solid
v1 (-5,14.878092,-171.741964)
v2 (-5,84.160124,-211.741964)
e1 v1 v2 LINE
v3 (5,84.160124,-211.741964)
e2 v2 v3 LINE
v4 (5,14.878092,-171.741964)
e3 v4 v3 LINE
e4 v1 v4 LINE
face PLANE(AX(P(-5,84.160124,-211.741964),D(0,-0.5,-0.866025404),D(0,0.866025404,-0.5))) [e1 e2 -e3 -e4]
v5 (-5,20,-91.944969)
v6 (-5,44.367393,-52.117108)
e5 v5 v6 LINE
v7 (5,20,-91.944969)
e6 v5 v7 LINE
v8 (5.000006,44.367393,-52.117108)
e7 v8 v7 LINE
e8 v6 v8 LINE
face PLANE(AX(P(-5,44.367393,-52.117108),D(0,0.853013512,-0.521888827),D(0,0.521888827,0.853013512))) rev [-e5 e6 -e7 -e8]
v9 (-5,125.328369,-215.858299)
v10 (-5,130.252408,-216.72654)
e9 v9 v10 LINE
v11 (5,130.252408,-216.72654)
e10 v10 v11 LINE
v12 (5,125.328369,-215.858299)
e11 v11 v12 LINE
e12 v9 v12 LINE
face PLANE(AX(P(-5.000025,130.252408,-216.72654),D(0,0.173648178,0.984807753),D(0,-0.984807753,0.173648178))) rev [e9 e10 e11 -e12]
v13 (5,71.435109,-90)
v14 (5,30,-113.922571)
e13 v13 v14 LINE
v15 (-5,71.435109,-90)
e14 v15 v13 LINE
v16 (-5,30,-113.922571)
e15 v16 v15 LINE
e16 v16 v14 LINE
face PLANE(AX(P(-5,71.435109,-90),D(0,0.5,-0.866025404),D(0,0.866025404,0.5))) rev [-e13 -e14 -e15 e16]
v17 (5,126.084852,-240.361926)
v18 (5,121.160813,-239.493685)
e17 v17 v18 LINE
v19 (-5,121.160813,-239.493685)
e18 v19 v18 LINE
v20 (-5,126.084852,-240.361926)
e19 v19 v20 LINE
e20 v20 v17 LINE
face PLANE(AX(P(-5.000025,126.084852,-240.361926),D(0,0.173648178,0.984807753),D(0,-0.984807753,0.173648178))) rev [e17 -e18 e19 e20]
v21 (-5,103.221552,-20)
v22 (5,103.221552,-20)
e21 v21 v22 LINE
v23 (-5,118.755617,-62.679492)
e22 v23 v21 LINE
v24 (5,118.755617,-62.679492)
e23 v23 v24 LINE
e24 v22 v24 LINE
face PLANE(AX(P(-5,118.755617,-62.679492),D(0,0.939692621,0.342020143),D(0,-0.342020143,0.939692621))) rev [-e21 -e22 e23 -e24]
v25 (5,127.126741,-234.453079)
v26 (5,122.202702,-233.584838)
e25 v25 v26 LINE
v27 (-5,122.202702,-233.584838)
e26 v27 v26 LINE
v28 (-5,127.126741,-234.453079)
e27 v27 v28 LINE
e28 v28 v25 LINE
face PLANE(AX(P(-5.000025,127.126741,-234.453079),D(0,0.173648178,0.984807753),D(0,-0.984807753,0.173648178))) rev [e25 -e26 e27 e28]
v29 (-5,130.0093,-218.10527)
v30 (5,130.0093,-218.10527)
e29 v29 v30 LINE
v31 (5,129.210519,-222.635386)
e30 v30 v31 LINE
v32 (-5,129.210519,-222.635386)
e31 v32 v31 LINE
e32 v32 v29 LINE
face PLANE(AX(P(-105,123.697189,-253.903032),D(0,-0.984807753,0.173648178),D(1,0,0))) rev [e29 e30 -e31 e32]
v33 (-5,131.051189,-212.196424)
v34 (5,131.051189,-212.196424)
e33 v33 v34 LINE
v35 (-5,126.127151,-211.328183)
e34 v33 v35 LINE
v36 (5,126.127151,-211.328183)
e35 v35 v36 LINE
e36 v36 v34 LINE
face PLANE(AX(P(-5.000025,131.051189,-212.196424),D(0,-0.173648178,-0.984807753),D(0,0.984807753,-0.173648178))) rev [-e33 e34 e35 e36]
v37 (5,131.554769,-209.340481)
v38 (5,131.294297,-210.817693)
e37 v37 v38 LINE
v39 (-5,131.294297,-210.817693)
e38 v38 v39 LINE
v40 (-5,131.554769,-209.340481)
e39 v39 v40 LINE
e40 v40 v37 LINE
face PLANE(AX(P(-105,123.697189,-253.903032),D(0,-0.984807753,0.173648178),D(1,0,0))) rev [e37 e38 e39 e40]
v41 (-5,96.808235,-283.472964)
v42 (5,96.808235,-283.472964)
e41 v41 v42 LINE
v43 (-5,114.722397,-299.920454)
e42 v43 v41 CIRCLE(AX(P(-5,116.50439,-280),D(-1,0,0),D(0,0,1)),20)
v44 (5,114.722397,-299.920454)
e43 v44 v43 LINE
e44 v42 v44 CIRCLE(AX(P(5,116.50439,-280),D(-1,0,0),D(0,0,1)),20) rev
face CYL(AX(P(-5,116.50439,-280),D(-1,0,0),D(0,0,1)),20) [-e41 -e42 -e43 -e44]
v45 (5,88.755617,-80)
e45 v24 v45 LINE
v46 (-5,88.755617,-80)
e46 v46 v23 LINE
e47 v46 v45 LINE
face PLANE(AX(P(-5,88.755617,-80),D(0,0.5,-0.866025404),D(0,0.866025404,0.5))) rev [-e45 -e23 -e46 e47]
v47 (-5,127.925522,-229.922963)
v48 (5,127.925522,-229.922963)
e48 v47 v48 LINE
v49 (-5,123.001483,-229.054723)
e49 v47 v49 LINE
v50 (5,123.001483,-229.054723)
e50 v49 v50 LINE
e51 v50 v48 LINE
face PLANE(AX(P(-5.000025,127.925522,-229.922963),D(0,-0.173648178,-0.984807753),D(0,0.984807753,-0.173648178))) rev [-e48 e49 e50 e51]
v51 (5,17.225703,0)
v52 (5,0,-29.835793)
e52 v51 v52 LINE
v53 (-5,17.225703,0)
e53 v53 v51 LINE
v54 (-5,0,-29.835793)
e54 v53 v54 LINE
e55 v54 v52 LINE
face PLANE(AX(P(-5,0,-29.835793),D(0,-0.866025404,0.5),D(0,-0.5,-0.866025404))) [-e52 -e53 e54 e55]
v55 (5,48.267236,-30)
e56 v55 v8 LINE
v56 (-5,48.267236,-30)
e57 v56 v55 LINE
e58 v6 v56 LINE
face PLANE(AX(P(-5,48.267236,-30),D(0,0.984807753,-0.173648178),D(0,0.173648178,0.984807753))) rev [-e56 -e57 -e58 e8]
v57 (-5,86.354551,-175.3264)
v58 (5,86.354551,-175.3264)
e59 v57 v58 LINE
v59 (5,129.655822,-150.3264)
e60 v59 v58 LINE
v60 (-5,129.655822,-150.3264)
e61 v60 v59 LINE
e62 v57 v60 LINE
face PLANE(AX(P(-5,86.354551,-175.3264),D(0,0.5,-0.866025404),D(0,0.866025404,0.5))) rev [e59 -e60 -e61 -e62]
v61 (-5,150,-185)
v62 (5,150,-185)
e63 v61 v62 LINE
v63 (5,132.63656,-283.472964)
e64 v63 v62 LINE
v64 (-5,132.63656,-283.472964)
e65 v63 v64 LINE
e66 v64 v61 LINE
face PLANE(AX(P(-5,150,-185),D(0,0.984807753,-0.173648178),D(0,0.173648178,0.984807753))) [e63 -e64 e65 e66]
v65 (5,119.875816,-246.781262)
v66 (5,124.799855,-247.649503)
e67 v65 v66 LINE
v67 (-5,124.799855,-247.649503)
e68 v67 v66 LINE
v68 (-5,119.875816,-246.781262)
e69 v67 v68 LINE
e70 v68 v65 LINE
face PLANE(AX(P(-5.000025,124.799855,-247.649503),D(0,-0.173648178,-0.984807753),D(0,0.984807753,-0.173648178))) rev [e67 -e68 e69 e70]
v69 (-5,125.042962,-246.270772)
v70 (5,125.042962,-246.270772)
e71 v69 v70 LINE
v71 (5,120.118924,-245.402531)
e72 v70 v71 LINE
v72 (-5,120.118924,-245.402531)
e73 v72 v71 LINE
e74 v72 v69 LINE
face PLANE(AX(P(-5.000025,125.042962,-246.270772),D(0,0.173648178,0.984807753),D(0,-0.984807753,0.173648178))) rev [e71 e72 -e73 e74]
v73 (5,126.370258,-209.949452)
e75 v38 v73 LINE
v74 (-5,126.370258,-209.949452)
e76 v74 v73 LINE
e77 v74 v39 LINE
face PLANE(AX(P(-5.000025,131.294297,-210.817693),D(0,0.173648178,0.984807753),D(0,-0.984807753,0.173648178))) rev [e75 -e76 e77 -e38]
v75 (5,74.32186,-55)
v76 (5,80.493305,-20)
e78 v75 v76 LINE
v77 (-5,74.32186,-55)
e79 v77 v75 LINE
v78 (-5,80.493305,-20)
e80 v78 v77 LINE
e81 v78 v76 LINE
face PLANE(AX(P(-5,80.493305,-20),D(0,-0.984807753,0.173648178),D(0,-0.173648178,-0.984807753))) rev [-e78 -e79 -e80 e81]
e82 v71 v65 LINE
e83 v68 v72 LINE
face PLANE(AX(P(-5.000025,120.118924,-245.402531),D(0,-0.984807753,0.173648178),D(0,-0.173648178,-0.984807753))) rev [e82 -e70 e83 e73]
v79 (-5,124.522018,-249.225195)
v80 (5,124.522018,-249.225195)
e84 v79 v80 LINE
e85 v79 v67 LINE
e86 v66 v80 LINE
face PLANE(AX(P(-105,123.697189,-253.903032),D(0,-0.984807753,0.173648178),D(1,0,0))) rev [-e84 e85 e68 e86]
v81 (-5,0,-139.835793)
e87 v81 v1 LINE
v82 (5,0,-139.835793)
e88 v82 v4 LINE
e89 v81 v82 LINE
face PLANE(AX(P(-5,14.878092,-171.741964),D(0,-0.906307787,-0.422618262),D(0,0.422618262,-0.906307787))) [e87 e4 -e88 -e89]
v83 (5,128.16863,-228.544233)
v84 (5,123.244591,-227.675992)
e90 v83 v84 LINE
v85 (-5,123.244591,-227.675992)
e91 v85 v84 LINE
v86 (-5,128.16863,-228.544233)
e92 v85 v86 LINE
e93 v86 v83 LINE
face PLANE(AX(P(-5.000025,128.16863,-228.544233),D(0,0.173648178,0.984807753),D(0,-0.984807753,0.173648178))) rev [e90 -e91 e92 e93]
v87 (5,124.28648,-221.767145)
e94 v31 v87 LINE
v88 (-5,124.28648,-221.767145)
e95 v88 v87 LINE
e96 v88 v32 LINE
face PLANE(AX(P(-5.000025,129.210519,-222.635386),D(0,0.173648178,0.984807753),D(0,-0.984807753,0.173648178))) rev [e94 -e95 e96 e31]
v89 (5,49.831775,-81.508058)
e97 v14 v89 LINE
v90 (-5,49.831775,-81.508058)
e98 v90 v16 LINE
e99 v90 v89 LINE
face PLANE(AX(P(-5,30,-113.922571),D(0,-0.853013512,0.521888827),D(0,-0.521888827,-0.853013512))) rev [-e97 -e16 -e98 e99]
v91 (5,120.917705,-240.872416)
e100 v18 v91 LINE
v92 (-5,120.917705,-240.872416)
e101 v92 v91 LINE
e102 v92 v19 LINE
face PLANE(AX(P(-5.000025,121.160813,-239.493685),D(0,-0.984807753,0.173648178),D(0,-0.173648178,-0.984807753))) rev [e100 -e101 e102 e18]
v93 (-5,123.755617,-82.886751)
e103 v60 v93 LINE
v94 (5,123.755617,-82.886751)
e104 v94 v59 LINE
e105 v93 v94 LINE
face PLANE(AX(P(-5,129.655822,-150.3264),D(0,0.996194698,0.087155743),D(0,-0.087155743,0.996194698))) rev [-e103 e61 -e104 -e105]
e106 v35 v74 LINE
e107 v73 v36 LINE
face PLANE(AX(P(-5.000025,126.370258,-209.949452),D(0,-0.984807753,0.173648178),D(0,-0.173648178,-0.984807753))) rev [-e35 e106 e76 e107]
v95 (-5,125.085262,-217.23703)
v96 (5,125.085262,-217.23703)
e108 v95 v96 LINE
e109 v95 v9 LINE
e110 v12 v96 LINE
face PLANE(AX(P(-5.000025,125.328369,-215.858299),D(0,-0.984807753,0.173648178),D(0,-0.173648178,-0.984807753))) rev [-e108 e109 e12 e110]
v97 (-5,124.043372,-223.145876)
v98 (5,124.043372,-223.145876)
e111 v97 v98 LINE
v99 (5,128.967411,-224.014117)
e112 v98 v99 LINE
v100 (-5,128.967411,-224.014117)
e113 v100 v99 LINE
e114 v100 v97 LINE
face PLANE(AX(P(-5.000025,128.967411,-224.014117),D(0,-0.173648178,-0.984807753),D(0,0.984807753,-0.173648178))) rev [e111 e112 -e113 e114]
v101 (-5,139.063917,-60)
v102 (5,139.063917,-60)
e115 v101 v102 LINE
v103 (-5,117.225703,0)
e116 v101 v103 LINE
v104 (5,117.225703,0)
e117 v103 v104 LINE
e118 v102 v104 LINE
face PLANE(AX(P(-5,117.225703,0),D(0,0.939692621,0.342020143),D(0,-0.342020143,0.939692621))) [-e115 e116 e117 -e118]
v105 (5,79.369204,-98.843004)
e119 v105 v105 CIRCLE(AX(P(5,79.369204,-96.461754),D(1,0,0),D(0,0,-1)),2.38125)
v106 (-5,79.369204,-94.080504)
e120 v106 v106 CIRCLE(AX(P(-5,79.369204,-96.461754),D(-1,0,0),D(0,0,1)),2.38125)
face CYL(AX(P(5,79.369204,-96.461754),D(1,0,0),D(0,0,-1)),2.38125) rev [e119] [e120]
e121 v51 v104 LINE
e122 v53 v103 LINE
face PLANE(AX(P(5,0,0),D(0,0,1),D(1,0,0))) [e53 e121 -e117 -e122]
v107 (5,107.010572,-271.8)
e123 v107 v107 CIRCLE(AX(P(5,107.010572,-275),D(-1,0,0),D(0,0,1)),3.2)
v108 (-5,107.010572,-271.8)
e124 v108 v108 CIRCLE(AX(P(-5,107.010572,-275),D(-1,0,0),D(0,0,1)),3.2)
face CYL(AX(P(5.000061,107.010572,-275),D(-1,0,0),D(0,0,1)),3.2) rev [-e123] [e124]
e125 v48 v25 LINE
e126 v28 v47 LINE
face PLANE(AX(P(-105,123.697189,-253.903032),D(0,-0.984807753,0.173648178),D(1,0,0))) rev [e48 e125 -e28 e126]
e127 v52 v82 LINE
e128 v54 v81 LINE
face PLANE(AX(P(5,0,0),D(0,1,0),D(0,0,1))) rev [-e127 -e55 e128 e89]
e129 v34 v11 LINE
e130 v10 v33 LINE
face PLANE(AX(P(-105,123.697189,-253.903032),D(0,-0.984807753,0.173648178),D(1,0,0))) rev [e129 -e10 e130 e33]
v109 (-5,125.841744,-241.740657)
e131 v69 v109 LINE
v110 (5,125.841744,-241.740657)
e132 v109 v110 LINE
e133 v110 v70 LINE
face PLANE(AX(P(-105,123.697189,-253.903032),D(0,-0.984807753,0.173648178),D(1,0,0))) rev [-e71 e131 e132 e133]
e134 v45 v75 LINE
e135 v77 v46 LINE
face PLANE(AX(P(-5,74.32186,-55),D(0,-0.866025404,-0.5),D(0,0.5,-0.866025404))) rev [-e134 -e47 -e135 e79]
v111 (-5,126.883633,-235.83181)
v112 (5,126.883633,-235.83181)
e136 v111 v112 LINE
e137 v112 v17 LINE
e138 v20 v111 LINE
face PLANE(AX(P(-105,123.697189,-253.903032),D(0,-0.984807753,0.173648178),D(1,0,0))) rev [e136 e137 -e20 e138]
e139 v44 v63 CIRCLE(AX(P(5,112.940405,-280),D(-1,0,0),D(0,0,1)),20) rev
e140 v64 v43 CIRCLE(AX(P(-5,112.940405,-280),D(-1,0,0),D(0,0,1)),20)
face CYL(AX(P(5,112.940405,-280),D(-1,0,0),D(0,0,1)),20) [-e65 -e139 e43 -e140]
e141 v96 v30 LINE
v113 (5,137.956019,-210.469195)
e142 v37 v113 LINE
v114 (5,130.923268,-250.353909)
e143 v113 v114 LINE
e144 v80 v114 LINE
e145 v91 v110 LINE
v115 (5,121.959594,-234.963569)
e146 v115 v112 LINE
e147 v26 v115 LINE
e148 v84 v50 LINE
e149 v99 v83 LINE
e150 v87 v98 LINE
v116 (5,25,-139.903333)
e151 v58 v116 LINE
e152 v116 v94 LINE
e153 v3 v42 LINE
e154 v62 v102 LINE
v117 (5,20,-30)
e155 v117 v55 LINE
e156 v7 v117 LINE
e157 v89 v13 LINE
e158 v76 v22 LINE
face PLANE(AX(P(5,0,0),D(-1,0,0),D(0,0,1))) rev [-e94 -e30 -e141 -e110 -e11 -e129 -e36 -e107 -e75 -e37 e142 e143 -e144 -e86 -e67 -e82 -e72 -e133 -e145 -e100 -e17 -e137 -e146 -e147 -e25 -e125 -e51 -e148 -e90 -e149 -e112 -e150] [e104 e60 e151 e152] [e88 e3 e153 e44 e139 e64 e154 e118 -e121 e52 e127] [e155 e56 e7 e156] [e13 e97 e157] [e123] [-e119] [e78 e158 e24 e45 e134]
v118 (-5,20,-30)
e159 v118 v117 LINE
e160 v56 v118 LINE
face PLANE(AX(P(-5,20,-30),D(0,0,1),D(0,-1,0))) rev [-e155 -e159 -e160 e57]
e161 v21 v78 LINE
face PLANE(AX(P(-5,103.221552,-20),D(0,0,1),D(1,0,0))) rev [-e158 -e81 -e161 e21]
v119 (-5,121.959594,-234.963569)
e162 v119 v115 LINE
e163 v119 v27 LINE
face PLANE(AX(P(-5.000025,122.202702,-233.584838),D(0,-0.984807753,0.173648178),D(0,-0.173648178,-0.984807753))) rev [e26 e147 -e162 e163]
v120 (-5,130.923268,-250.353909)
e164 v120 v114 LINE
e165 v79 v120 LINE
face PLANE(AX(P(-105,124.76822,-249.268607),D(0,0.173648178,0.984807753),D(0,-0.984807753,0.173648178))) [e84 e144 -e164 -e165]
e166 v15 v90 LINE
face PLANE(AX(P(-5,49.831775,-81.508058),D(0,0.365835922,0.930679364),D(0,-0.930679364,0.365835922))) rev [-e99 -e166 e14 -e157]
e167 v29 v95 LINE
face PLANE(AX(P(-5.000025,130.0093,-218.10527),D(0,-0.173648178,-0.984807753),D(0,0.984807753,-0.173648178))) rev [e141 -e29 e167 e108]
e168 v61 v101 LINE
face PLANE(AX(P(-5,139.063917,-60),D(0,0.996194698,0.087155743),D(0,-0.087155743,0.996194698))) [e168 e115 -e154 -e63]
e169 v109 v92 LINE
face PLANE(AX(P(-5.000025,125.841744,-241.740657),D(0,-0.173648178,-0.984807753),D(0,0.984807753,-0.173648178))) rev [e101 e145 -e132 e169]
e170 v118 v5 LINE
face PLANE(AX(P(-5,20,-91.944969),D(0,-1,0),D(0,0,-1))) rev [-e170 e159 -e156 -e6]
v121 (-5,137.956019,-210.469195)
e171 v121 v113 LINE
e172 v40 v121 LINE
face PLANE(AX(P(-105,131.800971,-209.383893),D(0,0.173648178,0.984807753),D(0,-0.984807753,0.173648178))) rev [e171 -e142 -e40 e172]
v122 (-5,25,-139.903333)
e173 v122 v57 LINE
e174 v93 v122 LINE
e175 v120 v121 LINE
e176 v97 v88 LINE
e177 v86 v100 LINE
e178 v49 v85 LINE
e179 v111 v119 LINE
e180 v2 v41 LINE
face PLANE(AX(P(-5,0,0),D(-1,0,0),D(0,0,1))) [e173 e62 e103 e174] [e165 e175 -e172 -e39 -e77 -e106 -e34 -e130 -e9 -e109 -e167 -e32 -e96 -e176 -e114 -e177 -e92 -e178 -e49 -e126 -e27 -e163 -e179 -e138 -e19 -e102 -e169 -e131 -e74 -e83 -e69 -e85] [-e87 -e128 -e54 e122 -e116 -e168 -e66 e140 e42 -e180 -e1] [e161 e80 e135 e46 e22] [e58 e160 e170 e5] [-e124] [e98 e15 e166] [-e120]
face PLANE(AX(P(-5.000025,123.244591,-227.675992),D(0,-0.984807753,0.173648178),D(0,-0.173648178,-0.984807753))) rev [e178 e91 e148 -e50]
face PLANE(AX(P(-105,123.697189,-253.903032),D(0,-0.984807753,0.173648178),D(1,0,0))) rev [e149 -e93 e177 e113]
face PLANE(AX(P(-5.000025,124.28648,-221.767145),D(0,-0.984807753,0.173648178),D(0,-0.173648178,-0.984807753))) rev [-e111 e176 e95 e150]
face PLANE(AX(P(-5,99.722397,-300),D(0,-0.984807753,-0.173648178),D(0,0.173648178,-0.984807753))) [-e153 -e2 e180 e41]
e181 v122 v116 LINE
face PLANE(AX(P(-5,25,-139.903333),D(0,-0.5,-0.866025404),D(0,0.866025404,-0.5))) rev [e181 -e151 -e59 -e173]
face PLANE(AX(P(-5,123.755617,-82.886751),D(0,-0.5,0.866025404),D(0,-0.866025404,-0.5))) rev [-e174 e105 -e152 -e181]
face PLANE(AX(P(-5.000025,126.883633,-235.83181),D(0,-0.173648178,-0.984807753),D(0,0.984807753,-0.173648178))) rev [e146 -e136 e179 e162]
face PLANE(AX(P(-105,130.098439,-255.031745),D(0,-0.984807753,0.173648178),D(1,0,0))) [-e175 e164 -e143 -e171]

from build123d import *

# Parameters (mm, degrees)
ESQUISSE1_W                             = 300
ESQUISSE1_H                             = 150
BOSS_EXTRU_1_DEPTH                      = 5
ESQUISSE2_OUTSIDE_W                     = 369.112
ESQUISSE2_OUTSIDE_H                     = 219.112
ENL_V_MAT_EXTRU_1_DEPTH                 = 5
ENL_V_MAT_EXTRU_2_DEPTH                 = 336.559234711
ENL_V_MAT_EXTRU_2_DEPTH_BACK            = 336.559234711
ENL_V_MAT_EXTRU_4_DEPTH                 = 336.559234711
ENL_V_MAT_EXTRU_4_DEPTH_BACK            = 336.559234711
ESQUISSE5_R                             = 3.2
EMPREINTE1_START                        = -213.565883238
EMPREINTE1_OUTLINE_W                    = 10
EMPREINTE1_OUTLINE_H                    = 6
EMPREINTE1_DEPTH                        = 20
D_PLACER_START                          = -213.815883238
D_PLACER_LA_FACE1_OUTLINE_W             = 10
D_PLACER_LA_FACE1_OUTLINE_H             = 6.5
D_PLACER_LA_FACE1_DEPTH                 = 20.5
D_PLACER_LA_FACE2_BY                    = 10
D_PLACER_LA_FACE3_BY                    = 10
ENL_V_MAT_EXTRU_5_DEPTH                 = 336.559234711
R_P_TITION_LIN_AIRE1_COUNT              = 7
R_P_TITION_LIN_AIRE1_PITCH              = 6
CONG_1_R                                = 20
PER_AGE_POUR_CROUS_AUTO_BLOQUANTS_300_D = 4.7625


# Read off the part's stored shape, not the designer's step: Empreinte1, Déplacer la face1
with BuildPart() as part:
    # Esquisse1 → Boss.-Extru.1 (new, symmetric)
    with BuildSketch(Plane(origin=(0, 0, 0), x_dir=(0, 0, -1), z_dir=(1, 0, 0))):
        with Locations((150, 75)):
            Rectangle(ESQUISSE1_W, ESQUISSE1_H)
    extrude(amount=BOSS_EXTRU_1_DEPTH, both=True)

    # Esquisse2 outside → Enlèv. mat.-Extru.1 (cut, symmetric)
    with BuildSketch(Plane(origin=(0, 0, 0), x_dir=(0, 0, -1), z_dir=(1, 0, 0))):
        with Locations((150, 75)):
            Rectangle(ESQUISSE2_OUTSIDE_W, ESQUISSE2_OUTSIDE_H)
        Polygon((0, 117.225703003), (60, 139.063917059), (185, 150), (300, 129.722397219), (300, 99.722397219), (211.741963761, 84.160124165), (171.741963761, 14.878091862), (139.835792798, 0), (29.835792798, 0), (0, 17.225703003), align=None, mode=Mode.SUBTRACT)
    extrude(amount=ENL_V_MAT_EXTRU_1_DEPTH, both=True, mode=Mode.SUBTRACT)

    # Esquisse3 → Enlèv. mat.-Extru.2 (cut, two sides: drawn at the far end of the back side and taken through both)
    with BuildSketch(Plane(origin=(5, 0, 0), x_dir=(0, 0, -1), z_dir=(1, 0, 0)).offset(-ENL_V_MAT_EXTRU_2_DEPTH_BACK)):
        Polygon((20, 103.221552239), (20, 80.493304508), (55, 74.321860183), (80, 88.755616913), (62.679491924, 118.755616913), align=None)
        Polygon((90, 71.435108837), (113.922571241, 30), (81.508057782, 49.831775443), align=None)
        Polygon((82.886751346, 123.755616913), (139.903333355, 25), (175.32640016, 86.354551467), (150.32640016, 129.655821657), align=None)
        Polygon((91.944969354, 20), (30, 20), (30, 48.267236345), (52.117107943, 44.367393479), align=None)
    extrude(amount=ENL_V_MAT_EXTRU_2_DEPTH + ENL_V_MAT_EXTRU_2_DEPTH_BACK, mode=Mode.SUBTRACT)

    # Esquisse5 → Enlèv. mat.-Extru.4 (cut, two sides: drawn at the far end of the back side and taken through both)
    with BuildSketch(Plane.ZY.offset(5).offset(-ENL_V_MAT_EXTRU_4_DEPTH_BACK)):
        with Locations((-275, 107.010571736)):
            Circle(ESQUISSE5_R)
    extrude(amount=ENL_V_MAT_EXTRU_4_DEPTH + ENL_V_MAT_EXTRU_4_DEPTH_BACK, mode=Mode.SUBTRACT)

    # Empreinte1 outline → Empreinte1 (cut)
    with BuildSketch(Plane(origin=(0, 0, 0), x_dir=(1, 0, 0), z_dir=(0, 0.173648177666931, 0.984807753012208)).offset(EMPREINTE1_START)):
        with Locations((0, 169.157749671)):
            Rectangle(EMPREINTE1_OUTLINE_W, EMPREINTE1_OUTLINE_H)
    extrude(amount=EMPREINTE1_DEPTH, mode=Mode.SUBTRACT)

    # Déplacer la face1 outline → Déplacer la face1 (cut)
    with BuildSketch(Plane(origin=(0, 0, 0), x_dir=(1, 0, 0), z_dir=(0, 0.173648177666931, 0.984807753012208)).offset(D_PLACER_START)):
        with Locations((0, 169.157749671)):
            Rectangle(D_PLACER_LA_FACE1_OUTLINE_W, D_PLACER_LA_FACE1_OUTLINE_H)
    extrude(amount=D_PLACER_LA_FACE1_DEPTH, mode=Mode.SUBTRACT)

    # Déplacer la face2: a face moved inward by 10.0
    extrude(part.faces().sort_by_distance((0, 133.01891252, -219.752915562))[0], amount=D_PLACER_LA_FACE2_BY, dir=(0, 0.173648178, 0.984807753), mode=Mode.SUBTRACT)

    # Déplacer la face3: a face moved inward by 10.0
    extrude(part.faces().sort_by_distance((0, 129.459124878, -239.941474499))[0], amount=D_PLACER_LA_FACE3_BY, dir=(0, -0.173648178, -0.984807753), mode=Mode.SUBTRACT)

    # Esquisse6 → Enlèv. mat.-Extru.5 (cut, through all)
    with BuildSketch(Plane(origin=(5, 0, 0), x_dir=(0, 0, -1), z_dir=(1, 0, 0))):
        Polygon((210.817693083, 131.294296833), (209.949452195, 126.370258067), (211.328183049, 126.127150619), (212.196423938, 131.051189384), align=None)
    enl_v_mat_extru_5 = extrude(amount=-ENL_V_MAT_EXTRU_5_DEPTH, mode=Mode.SUBTRACT)

    # Répétition linéaire1: Enlèv. mat.-Extru.5 ×7
    with Locations(*[Vector(0, -0.17364817766693066, -0.9848077530122081) * (i * R_P_TITION_LIN_AIRE1_PITCH) for i in range(1, R_P_TITION_LIN_AIRE1_COUNT)]):
        add(enl_v_mat_extru_5, mode=Mode.SUBTRACT)

    # Congé1
    # the kernel refuses this fillet: 20 mm, written as the material it takes off along each edge
    with BuildSketch(Plane(origin=(-46.954981559, 129.722397219, -300), x_dir=(0, 0.17364817766693125, 0.9848077530122079), z_dir=(1, 0, 0))) as cong_1_piece_1:
        with BuildLine():
            CenterArc((CONG_1_R * 0.839099631177, CONG_1_R), CONG_1_R, 190, 80)
            Line((-CONG_1_R * 0.145708121835, CONG_1_R * 0.826351822333), (0, 0))
            Line((0, 0), (CONG_1_R * 0.839099631177, 0))
        make_face()
    extrude(amount=93.909963118, mode=Mode.SUBTRACT)
    with BuildSketch(Plane(origin=(-46.954981559, 99.722397219, -300), x_dir=(0, -0.17364817766692434, 0.984807753012209), z_dir=(1, 0, 0))) as cong_1_piece_2:
        with BuildLine():
            CenterArc((CONG_1_R * 0.839099631177, -CONG_1_R), CONG_1_R, 90, 80)
            Line((-CONG_1_R * 0.145708121835, -CONG_1_R * 0.826351822333), (0, 0))
            Line((0, 0), (CONG_1_R * 0.839099631177, 0))
        make_face()
    extrude(amount=93.909963118, mode=Mode.SUBTRACT)

    # Perçage pour écrous auto-bloquants 300® #6 (SP)1 (through all)
    with Locations(Plane(origin=(5, 0, 0), x_dir=(0, 0, -1), z_dir=(1, 0, 0))):
        with Locations((96.461753504, 79.36920384)):
            Hole(PER_AGE_POUR_CROUS_AUTO_BLOQUANTS_300_D / 2)


solid = part.part
